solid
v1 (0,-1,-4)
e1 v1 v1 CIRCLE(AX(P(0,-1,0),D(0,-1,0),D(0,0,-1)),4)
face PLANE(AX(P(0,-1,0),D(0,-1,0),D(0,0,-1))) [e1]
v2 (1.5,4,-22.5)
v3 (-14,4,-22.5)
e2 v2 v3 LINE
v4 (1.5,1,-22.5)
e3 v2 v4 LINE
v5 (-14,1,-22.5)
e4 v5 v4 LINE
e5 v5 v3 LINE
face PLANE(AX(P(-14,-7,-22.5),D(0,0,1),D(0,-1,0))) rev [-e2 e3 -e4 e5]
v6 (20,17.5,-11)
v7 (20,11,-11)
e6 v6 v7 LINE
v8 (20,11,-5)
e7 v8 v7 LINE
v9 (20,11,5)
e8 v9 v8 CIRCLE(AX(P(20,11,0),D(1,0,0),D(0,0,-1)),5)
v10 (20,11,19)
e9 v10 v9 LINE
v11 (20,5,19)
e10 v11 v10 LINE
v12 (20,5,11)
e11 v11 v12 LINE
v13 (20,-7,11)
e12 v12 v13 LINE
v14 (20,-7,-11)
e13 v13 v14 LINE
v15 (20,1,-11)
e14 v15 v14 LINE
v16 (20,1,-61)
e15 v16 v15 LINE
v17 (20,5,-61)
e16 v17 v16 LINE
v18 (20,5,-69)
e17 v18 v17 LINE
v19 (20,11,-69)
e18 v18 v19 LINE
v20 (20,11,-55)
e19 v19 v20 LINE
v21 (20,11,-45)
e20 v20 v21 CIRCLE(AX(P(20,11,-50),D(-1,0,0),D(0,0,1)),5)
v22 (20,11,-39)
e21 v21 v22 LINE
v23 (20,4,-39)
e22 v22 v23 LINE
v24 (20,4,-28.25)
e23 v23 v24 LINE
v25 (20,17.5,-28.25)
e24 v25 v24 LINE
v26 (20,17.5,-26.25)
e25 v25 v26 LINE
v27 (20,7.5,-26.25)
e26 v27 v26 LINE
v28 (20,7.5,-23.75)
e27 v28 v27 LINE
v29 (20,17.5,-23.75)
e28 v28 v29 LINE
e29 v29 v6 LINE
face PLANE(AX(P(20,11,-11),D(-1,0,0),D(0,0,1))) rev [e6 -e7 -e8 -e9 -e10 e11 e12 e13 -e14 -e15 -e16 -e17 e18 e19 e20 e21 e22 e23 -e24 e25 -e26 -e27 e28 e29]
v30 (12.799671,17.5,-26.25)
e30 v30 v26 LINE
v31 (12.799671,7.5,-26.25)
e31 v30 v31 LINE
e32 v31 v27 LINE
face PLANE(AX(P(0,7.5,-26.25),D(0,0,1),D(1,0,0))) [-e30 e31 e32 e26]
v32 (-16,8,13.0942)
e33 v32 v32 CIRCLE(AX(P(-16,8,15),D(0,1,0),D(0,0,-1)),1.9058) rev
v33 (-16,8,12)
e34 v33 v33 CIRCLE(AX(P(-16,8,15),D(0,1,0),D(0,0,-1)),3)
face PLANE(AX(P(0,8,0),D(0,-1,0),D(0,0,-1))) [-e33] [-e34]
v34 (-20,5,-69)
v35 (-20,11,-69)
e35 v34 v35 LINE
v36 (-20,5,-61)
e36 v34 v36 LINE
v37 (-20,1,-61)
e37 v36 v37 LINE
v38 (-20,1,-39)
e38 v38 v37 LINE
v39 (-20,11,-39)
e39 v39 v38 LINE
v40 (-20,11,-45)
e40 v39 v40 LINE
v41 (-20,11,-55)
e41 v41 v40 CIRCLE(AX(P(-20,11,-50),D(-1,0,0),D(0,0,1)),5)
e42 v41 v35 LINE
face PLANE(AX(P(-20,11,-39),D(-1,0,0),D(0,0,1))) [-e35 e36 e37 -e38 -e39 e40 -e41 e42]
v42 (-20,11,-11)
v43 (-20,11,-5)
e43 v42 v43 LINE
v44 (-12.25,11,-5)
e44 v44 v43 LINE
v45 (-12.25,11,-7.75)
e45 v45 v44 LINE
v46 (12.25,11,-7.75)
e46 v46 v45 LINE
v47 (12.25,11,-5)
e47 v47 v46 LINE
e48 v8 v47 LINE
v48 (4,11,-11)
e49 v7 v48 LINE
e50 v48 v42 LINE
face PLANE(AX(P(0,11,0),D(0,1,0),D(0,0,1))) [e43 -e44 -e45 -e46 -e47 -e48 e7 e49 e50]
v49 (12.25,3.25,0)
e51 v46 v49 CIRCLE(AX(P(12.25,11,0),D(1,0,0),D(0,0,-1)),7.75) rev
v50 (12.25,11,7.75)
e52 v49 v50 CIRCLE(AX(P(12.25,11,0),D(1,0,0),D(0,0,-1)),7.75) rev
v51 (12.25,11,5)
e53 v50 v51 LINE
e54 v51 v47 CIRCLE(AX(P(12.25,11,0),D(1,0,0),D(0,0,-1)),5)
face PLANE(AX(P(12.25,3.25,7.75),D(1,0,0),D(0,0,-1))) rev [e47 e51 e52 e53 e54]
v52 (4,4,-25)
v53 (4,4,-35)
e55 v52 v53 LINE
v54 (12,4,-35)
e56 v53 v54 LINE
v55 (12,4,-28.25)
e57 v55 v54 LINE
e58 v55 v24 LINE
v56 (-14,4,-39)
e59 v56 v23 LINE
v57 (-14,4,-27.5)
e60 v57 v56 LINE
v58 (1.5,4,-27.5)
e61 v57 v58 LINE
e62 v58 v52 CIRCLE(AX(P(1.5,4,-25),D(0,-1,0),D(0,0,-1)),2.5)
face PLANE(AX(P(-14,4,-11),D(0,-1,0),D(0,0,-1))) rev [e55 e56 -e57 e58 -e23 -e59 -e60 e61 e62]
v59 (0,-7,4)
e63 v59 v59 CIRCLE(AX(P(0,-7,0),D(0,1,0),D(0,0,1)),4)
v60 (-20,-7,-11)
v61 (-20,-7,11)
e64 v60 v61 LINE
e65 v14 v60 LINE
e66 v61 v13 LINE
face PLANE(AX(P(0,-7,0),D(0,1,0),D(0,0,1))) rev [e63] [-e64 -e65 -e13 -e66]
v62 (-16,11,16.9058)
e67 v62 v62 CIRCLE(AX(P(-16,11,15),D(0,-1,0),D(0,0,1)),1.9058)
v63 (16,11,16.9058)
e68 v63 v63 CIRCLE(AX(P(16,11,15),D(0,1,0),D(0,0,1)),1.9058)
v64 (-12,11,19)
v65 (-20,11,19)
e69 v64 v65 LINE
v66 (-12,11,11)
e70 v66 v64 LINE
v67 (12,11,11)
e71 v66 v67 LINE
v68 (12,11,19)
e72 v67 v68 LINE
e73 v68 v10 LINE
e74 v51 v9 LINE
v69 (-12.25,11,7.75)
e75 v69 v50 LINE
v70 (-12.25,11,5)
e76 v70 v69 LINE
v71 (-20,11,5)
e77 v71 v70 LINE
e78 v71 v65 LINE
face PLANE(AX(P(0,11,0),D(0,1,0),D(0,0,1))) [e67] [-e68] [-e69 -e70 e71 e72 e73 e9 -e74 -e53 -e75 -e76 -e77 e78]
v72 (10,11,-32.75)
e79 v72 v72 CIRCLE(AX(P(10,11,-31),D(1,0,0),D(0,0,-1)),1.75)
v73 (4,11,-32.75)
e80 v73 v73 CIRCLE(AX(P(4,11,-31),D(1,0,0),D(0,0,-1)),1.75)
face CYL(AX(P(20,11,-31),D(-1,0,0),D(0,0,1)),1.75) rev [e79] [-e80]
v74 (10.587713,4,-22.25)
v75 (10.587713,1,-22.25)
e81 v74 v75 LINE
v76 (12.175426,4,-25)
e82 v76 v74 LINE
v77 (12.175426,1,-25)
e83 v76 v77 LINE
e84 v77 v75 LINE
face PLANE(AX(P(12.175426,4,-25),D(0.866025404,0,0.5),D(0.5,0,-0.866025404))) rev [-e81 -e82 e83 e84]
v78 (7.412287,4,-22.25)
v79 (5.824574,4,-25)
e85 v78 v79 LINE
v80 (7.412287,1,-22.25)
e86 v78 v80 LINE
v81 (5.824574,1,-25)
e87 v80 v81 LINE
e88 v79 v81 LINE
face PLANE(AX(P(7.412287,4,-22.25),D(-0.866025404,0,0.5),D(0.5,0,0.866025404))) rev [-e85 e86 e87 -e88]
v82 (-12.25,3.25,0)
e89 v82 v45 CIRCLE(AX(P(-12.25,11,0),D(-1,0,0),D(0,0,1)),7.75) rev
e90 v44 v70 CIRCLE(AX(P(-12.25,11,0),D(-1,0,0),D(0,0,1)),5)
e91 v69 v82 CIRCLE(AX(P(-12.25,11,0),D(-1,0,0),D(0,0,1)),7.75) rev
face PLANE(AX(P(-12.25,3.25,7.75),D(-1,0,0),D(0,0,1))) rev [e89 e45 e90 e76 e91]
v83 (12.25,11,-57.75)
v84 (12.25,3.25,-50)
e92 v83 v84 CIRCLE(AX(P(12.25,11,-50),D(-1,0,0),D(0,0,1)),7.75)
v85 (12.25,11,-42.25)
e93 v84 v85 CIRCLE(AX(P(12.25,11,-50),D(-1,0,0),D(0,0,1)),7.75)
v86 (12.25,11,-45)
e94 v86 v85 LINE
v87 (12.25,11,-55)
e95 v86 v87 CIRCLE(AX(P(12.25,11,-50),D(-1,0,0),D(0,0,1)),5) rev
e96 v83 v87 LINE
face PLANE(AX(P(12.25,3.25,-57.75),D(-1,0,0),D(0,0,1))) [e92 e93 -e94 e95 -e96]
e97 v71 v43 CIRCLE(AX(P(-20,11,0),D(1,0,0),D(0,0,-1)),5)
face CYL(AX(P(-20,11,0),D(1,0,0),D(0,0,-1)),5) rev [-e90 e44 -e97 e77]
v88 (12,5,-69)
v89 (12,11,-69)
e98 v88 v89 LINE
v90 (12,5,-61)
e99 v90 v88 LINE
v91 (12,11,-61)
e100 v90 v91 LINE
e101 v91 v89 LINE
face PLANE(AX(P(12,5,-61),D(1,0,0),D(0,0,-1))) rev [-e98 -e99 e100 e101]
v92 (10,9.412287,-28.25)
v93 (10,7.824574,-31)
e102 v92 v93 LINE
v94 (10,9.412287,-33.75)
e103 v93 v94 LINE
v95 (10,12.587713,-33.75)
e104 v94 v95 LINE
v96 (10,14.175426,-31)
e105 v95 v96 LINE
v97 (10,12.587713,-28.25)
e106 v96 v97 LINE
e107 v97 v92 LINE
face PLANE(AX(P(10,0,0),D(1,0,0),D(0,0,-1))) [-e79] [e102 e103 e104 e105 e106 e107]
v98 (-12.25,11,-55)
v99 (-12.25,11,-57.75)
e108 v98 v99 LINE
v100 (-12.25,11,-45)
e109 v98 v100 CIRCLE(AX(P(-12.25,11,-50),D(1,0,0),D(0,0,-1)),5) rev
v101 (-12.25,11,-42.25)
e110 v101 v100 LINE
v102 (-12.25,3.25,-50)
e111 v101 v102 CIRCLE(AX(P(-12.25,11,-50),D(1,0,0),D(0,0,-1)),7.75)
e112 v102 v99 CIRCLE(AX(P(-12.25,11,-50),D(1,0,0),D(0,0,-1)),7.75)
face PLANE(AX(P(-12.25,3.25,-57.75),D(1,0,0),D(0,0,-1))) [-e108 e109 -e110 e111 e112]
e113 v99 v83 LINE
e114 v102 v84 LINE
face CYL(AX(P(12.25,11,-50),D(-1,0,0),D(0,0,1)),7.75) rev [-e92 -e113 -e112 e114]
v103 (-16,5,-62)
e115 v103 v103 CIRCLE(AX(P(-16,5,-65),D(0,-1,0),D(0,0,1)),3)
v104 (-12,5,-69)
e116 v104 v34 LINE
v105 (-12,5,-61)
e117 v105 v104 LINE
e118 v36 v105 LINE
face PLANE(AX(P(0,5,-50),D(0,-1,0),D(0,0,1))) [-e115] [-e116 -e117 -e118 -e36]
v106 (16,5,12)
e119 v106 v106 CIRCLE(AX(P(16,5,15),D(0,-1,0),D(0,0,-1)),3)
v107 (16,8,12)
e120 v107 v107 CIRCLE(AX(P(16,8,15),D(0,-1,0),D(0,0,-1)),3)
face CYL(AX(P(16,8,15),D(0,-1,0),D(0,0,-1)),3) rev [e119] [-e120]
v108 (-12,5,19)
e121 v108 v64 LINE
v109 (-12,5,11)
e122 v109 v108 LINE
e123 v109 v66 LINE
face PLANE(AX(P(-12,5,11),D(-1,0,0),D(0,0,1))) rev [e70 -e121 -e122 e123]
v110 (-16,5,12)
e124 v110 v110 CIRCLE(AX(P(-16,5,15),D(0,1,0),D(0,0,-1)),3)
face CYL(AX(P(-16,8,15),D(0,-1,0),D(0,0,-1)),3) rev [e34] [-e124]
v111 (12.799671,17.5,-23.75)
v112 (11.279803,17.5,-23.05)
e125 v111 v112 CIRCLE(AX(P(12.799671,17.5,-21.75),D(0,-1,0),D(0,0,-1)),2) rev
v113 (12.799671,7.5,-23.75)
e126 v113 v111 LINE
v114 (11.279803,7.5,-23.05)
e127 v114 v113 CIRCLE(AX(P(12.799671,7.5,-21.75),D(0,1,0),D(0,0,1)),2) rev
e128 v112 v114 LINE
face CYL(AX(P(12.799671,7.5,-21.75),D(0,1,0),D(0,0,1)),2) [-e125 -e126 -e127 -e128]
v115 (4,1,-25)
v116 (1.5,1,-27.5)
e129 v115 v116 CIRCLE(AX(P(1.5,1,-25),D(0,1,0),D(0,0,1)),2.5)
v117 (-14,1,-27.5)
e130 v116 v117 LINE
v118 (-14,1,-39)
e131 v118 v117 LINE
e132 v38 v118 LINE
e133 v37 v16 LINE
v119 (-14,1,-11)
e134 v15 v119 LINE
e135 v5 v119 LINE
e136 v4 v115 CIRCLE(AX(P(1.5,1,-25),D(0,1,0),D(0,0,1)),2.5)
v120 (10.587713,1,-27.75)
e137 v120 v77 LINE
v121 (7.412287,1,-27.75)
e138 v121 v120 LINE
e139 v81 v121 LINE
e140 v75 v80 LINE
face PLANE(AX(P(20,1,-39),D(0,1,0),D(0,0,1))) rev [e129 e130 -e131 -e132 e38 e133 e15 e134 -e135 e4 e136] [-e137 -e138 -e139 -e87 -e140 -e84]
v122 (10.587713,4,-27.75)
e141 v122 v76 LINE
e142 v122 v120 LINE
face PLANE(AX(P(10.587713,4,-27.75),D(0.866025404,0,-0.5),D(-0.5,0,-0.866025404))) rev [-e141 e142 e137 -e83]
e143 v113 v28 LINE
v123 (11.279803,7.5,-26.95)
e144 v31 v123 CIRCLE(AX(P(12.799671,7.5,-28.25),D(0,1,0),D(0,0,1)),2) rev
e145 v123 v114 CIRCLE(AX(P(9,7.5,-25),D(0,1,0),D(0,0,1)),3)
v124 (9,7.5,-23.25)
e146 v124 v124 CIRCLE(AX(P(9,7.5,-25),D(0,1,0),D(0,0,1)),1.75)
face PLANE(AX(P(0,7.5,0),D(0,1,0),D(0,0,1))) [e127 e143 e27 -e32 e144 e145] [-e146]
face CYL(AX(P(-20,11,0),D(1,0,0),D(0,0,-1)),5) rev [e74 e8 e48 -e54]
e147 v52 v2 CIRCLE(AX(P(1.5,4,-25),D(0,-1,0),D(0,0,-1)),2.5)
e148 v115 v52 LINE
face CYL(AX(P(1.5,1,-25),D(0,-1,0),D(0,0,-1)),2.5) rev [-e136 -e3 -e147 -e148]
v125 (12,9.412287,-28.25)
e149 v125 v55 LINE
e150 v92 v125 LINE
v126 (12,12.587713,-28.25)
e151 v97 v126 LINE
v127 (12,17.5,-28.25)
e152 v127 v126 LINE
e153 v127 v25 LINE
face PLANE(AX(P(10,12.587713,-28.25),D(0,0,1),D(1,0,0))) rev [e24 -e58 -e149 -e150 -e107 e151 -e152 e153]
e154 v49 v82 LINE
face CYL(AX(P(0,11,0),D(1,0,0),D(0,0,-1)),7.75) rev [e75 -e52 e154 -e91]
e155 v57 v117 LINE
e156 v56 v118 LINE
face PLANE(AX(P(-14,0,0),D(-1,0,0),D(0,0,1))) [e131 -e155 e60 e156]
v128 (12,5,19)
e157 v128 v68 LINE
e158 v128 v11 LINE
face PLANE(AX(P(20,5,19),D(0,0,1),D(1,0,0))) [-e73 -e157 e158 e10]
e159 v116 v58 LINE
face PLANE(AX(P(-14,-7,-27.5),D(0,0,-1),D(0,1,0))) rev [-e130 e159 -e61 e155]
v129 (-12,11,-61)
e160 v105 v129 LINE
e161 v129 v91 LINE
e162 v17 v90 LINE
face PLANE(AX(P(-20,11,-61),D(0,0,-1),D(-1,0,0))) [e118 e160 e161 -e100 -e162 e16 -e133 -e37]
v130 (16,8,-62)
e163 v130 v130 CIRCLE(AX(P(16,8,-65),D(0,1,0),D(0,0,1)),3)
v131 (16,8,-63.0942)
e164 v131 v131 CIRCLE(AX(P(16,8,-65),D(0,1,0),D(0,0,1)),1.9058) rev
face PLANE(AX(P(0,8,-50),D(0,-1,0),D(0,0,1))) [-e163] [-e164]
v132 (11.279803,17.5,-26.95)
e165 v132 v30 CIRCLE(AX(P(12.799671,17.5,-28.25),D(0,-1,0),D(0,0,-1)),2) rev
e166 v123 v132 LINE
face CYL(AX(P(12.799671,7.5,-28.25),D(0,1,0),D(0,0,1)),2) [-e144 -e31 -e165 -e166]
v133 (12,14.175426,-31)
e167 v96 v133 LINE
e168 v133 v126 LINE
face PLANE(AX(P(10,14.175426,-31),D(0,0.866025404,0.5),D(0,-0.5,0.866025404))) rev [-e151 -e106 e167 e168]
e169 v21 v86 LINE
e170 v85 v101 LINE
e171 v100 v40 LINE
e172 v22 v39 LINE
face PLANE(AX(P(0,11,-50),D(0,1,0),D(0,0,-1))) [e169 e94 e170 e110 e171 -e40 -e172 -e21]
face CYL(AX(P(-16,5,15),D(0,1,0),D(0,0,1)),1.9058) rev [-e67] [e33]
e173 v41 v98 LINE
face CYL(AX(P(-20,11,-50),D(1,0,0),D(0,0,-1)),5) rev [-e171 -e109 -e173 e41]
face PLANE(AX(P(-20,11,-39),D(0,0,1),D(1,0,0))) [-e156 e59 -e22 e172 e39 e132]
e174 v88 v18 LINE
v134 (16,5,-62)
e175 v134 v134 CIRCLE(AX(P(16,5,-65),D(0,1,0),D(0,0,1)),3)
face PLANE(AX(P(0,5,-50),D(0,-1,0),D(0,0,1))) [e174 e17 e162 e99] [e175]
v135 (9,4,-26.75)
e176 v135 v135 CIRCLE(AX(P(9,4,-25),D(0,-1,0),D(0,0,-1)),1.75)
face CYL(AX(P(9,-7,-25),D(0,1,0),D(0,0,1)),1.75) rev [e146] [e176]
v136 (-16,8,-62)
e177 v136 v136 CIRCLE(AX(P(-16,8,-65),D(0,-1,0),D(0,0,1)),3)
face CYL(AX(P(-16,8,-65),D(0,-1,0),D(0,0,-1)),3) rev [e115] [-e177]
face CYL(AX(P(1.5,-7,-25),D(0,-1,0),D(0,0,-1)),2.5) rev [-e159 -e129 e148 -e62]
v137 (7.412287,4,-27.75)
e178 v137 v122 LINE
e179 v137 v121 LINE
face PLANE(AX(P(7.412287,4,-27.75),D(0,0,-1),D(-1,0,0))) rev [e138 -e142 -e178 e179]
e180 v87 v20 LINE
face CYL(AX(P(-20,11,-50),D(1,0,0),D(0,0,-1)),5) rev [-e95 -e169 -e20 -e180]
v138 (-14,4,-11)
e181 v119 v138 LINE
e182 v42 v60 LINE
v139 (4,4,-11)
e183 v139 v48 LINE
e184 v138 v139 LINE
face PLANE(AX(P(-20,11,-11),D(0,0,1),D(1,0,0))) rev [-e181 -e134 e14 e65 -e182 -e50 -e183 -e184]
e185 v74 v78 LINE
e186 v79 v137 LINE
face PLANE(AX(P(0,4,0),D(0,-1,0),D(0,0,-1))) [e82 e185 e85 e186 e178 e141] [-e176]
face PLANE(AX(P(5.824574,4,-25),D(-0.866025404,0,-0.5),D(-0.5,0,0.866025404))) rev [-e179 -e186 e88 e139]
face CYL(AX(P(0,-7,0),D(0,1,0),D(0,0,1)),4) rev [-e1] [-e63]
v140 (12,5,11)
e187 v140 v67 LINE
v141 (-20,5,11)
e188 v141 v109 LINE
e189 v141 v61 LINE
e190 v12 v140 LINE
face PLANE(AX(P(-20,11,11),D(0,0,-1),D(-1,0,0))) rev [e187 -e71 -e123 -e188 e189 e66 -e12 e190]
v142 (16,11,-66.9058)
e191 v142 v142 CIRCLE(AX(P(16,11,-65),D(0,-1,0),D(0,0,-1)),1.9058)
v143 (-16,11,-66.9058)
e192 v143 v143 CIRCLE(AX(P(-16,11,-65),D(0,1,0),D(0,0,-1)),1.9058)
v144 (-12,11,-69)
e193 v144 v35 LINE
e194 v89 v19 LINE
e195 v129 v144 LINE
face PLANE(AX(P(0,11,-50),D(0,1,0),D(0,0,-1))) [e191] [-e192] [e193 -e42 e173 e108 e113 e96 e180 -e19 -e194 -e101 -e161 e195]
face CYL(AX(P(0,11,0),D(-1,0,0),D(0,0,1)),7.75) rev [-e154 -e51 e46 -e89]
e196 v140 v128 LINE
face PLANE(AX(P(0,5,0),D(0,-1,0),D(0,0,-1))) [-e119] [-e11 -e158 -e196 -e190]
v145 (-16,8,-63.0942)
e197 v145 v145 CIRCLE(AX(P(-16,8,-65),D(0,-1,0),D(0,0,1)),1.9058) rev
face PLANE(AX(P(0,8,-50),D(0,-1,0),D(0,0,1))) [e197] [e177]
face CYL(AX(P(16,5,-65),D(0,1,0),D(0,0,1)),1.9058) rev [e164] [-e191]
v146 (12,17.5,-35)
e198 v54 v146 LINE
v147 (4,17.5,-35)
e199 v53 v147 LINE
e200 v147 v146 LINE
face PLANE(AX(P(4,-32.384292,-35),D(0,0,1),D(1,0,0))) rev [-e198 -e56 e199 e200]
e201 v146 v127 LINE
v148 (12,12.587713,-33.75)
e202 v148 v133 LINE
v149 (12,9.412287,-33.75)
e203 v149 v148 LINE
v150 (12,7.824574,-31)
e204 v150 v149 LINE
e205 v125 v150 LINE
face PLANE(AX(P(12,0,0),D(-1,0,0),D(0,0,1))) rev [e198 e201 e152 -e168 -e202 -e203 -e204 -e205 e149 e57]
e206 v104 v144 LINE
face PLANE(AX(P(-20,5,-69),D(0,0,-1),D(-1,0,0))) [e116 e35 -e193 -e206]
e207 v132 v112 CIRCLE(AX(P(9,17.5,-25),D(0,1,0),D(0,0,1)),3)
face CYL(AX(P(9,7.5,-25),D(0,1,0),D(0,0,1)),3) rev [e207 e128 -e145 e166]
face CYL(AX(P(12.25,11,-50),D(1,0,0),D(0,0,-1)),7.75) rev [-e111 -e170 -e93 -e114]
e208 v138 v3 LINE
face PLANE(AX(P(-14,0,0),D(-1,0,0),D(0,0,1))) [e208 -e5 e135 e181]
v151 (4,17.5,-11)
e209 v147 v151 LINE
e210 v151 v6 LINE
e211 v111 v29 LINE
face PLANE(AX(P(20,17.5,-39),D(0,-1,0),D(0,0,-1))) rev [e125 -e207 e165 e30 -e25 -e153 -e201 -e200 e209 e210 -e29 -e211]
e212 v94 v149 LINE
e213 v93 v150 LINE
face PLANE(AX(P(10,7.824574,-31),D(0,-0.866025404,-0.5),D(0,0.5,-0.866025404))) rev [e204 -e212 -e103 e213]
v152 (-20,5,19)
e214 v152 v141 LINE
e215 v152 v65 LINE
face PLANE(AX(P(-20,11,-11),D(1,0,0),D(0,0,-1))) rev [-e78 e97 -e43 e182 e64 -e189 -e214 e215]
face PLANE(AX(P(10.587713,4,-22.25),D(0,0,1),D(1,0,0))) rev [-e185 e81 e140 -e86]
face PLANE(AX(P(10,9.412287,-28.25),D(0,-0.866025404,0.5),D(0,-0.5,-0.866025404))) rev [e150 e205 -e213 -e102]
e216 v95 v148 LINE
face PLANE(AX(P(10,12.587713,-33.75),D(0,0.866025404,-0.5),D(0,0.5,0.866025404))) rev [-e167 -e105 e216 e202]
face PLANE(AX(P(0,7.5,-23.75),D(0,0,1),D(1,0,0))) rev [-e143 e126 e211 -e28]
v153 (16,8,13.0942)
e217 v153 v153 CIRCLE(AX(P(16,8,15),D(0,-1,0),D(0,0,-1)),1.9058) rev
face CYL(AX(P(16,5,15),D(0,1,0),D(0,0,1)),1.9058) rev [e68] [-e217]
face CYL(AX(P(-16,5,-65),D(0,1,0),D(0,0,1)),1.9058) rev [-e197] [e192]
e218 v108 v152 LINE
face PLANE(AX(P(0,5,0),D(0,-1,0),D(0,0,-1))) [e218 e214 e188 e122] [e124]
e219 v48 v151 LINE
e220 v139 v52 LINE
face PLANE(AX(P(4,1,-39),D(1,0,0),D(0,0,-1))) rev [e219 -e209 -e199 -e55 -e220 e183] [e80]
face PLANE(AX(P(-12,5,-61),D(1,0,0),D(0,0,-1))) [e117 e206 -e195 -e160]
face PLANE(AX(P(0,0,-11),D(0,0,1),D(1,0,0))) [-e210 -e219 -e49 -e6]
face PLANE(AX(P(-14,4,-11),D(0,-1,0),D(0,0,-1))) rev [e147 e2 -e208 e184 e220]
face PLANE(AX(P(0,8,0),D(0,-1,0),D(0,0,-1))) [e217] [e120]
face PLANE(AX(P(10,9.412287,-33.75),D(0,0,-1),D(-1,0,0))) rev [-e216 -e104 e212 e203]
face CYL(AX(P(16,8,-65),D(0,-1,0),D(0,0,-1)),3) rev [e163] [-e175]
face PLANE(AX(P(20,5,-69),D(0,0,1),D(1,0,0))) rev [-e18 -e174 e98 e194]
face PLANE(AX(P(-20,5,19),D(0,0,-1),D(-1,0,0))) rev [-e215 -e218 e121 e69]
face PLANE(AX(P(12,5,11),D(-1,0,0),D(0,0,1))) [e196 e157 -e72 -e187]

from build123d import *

# Parameters (mm, degrees)
SKETCH1_W                  = 40
SKETCH1_H                  = 22
BOSS_EXTRUDE1_DEPTH        = 11
SKETCH2_W                  = 40
SKETCH2_H                  = 22
SKETCH2_R                  = 4
BOSS_EXTRUDE2_DEPTH        = 7
SKETCH3_W                  = 24.5
SKETCH3_H                  = 15.5
CUT_EXTRUDE1_DEPTH         = 7.75
FILLET1_R                  = 7.75
SKETCH4_R                  = 5
CUT_EXTRUDE2_DEPTH         = 36.805900352
SKETCH5_W                  = 8
SKETCH5_H                  = 8
SKETCH5_R                  = 1.905800151
BOSS_EXTRUDE3_DEPTH        = 6
CUT_EXTRUDE3_START         = -3
SKETCH6_R                  = 3
SKETCH6_R_2                = 1.905800151
CUT_EXTRUDE3_DEPTH         = 3
SKETCH7_W                  = 16
SKETCH7_H                  = 16.5
BOSS_EXTRUDE5_DEPTH        = 28
MIRROR14_COPY_1_SKETCH_W   = 8
MIRROR14_COPY_1_SKETCH_H   = 8
MIRROR14_COPY_1_SKETCH_R   = 1.905800151
MIRROR14_COPY_1_DEPTH      = 6
MIRROR14_START             = -3
MIRROR14_COPY_2_SKETCH_R   = 3
MIRROR14_COPY_2_SKETCH_R_2 = 1.905800151
MIRROR14_COPY_2_DEPTH      = 3
FILLET1_OF_MIRROR14_R      = 7.75
SKETCH9_W                  = 28
SKETCH9_H                  = 3
BOSS_EXTRUDE6_DEPTH        = 18
CUT_EXTRUDE4_DEPTH         = 10
CUT_EXTRUDE5_DEPTH         = 74.288812243
CUT_EXTRUDE5_DEPTH_BACK    = 74.288812243
SKETCH11_R                 = 1.75
CUT_EXTRUDE6_DEPTH         = 76.121568141
CUT_EXTRUDE6_DEPTH_BACK    = 76.121568141
SKETCH12_R                 = 1.75
FILLET2_R                  = 2
CUT_EXTRUDE12_START        = -3
SKETCH17_R                 = 1.75
CUT_EXTRUDE12_DEPTH        = 3
CUT_EXTRUDE13_DEPTH        = 74.097537578
CUT_EXTRUDE13_DEPTH_BACK   = 74.097537578
SKETCH18_W                 = 18
SKETCH18_H                 = 5
FILLET3_R                  = 2.5
CUT_EXTRUDE14_DEPTH        = 74.710582687
CUT_EXTRUDE15_START        = -10
SKETCH21_R                 = 1.75
CUT_EXTRUDE15_DEPTH        = 10
SKETCH20_W                 = 36.163748027
SKETCH20_H                 = 4
CUT_EXTRUDE16_DEPTH        = 13.5
SKETCH22_W                 = 6.75
SKETCH22_H                 = 13.5
CUT_EXTRUDE18_DEPTH        = 8
SKETCH23_R                 = 4
BOSS_EXTRUDE8_DEPTH        = 1


with BuildPart() as part:
    # Sketch1 → Boss-Extrude1 (new body)
    with BuildSketch(Plane(origin=(0, 0, 0), x_dir=(1, 0, 0), z_dir=(0, 1, 0))):
        Rectangle(SKETCH1_W, SKETCH1_H)
    boss_extrude1 = extrude(amount=BOSS_EXTRUDE1_DEPTH)

    # Sketch2 → Boss-Extrude2 (add)
    with BuildSketch(Plane(origin=(0, 0, 0), x_dir=(1, 0, 0), z_dir=(0, 1, 0))):
        Rectangle(SKETCH2_W, SKETCH2_H)
        with Locations(Location((0, 0, 0), (0, 0, 270))):
            Circle(SKETCH2_R, mode=Mode.SUBTRACT)
    boss_extrude2 = extrude(amount=-BOSS_EXTRUDE2_DEPTH)

    # Sketch3 → Cut-Extrude1 (cut)
    with BuildSketch(Plane(origin=(0, 11, 0), x_dir=(1, 0, 0), z_dir=(0, 1, 0))):
        Rectangle(SKETCH3_W, SKETCH3_H)
    cut_extrude1 = extrude(amount=-CUT_EXTRUDE1_DEPTH, mode=Mode.SUBTRACT)

    # Fillet1
    fillet1_edges = [part.edges().sort_by_distance(p)[0] for p in [
        (0, 3.25, 7.75),
        (0, 3.25, -7.75),
    ]]
    fillet(fillet1_edges, radius=FILLET1_R - 0.0001)  # a hair under: the kernel refuses the full size

    # Sketch4 → Cut-Extrude2 (cut, symmetric)
    with BuildSketch(Plane(origin=(-12.25, 0, 0), x_dir=(0, 0, -1), z_dir=(1, 0, 0))):
        with Locations((0, 11)):
            Circle(SKETCH4_R)
    cut_extrude2 = extrude(amount=CUT_EXTRUDE2_DEPTH, both=True, mode=Mode.SUBTRACT)

    # Sketch5 → Boss-Extrude3 (add)
    with BuildSketch(Plane(origin=(0, 11, 0), x_dir=(1, 0, 0), z_dir=(0, 1, 0))):
        with Locations((16, -15)):
            Rectangle(SKETCH5_W, SKETCH5_H)
        with Locations(Location((16, -15, 0), (0, 0, 270))):
            Circle(SKETCH5_R, mode=Mode.SUBTRACT)
    boss_extrude3 = extrude(amount=-BOSS_EXTRUDE3_DEPTH)

    # Sketch6 → Cut-Extrude3 (cut)
    with BuildSketch(Plane.XZ.offset(-5).offset(CUT_EXTRUDE3_START)):
        with Locations(Location((16, 15, 0), (0, 0, 270))):
            Circle(SKETCH6_R)
        with Locations(Location((16, 15, 0), (0, 0, 90))):
            Circle(SKETCH6_R_2, mode=Mode.SUBTRACT)
    cut_extrude3 = extrude(amount=CUT_EXTRUDE3_DEPTH, mode=Mode.SUBTRACT)

    # Mirror8: Boss-Extrude3, Cut-Extrude3 across plane
    add(boss_extrude3.mirror(Plane(origin=(0, 0, 0), x_dir=(0, 0, 1), z_dir=(1, 0, 0))))
    add(cut_extrude3.mirror(Plane(origin=(0, 0, 0), x_dir=(0, 0, 1), z_dir=(1, 0, 0))), mode=Mode.SUBTRACT)

    # Sketch7 → Boss-Extrude5 (add)
    with BuildSketch(Plane(origin=(0, 0, -11), x_dir=(-1, 0, 0), z_dir=(0, 0, -1))):
        with Locations((-12, 9.25)):
            Rectangle(SKETCH7_W, SKETCH7_H)
    extrude(amount=BOSS_EXTRUDE5_DEPTH)

    # Mirror14: Boss-Extrude1, Boss-Extrude2, Cut-Extrude1, Cut-Extrude2, Boss-Extrude3, Cut-Extrude3 across plane
    add(boss_extrude1.mirror(Plane.XY.offset(-25)))
    add(boss_extrude2.mirror(Plane.XY.offset(-25)))
    add(cut_extrude1.mirror(Plane.XY.offset(-25)), mode=Mode.SUBTRACT)
    add(cut_extrude2.mirror(Plane.XY.offset(-25)), mode=Mode.SUBTRACT)
    add(boss_extrude3.mirror(Plane.XY.offset(-25)))
    add(cut_extrude3.mirror(Plane.XY.offset(-25)), mode=Mode.SUBTRACT)

    # Mirror14 copy 1 sketch → Mirror14 copy 1 (add)
    with BuildSketch(Plane(origin=(0, 11, -50), x_dir=(-1, 0, 0), z_dir=(0, 1, 0))):
        with Locations((16, -15)):
            Rectangle(MIRROR14_COPY_1_SKETCH_W, MIRROR14_COPY_1_SKETCH_H)
        with Locations(Location((16, -15, 0), (0, 0, 270))):
            Circle(MIRROR14_COPY_1_SKETCH_R, mode=Mode.SUBTRACT)
    extrude(amount=-MIRROR14_COPY_1_DEPTH)

    # Mirror14 copy 2 sketch → Mirror14 copy 2 (cut)
    with BuildSketch(Plane(origin=(0, 5, -50), x_dir=(-1, 0, 0), z_dir=(0, -1, 0)).offset(MIRROR14_START)):
        with Locations(Location((16, 15, 0), (0, 0, 270))):
            Circle(MIRROR14_COPY_2_SKETCH_R)
        with Locations(Location((16, 15, 0), (0, 0, 90))):
            Circle(MIRROR14_COPY_2_SKETCH_R_2, mode=Mode.SUBTRACT)
    extrude(amount=MIRROR14_COPY_2_DEPTH, mode=Mode.SUBTRACT)

    # Fillet1 of Mirror14
    fillet1_of_mirror14_edges = [part.edges().sort_by_distance(p)[0] for p in [
        (0, 3.25, -57.75),
        (0, 3.25, -42.25),
    ]]
    fillet(fillet1_of_mirror14_edges, radius=FILLET1_OF_MIRROR14_R - 0.0001)  # a hair under: the kernel refuses the full size

    # Sketch9 → Boss-Extrude6 (add)
    with BuildSketch(Plane.ZY.offset(-4)):
        with Locations((-25, 2.5)):
            Rectangle(SKETCH9_W, SKETCH9_H)
    extrude(amount=BOSS_EXTRUDE6_DEPTH)

    # Sketch10 → Cut-Extrude4 (cut)
    with BuildSketch(Plane(origin=(0, 17.5, 0), x_dir=(1, 0, 0), z_dir=(0, 1, 0))):
        with BuildLine():
            Line((9, 26.25), (9, 23.75))
            Line((9, 23.75), (11.727178029, 23.75))
            ThreePointArc((11.727178029, 23.75), (11.931001031, 24.360286817), (12, 25))
            ThreePointArc((12, 25), (11.931001031, 25.639713183), (11.727178029, 26.25))
            Line((11.727178029, 26.25), (9, 26.25))
        make_face()
        with BuildLine():
            Line((11.727178029, 23.75), (9, 23.75))
            Line((9, 23.75), (9, 26.25))
            Line((9, 26.25), (11.727178029, 26.25))
            ThreePointArc((11.727178029, 26.25), (6, 25), (11.727178029, 23.75))
        make_face()
        with BuildLine():
            ThreePointArc((12, 25), (11.931001031, 24.360286817), (11.727178029, 23.75))
            Line((11.727178029, 23.75), (20, 23.75))
            Line((20, 23.75), (20, 26.25))
            Line((20, 26.25), (11.727178029, 26.25))
            ThreePointArc((11.727178029, 26.25), (11.931001031, 25.639713183), (12, 25))
        make_face()
    extrude(amount=-CUT_EXTRUDE4_DEPTH, mode=Mode.SUBTRACT)

    # Sketch11 → Cut-Extrude5 (cut, two sides: drawn at the far end of the back side and taken through both)
    with BuildSketch(Plane(origin=(0, 7.5, 0), x_dir=(1, 0, 0), z_dir=(0, 1, 0)).offset(-CUT_EXTRUDE5_DEPTH_BACK)):
        with Locations(Location((9, 25, 0), (0, 0, 270))):
            Circle(SKETCH11_R)
    extrude(amount=CUT_EXTRUDE5_DEPTH + CUT_EXTRUDE5_DEPTH_BACK, mode=Mode.SUBTRACT)

    # Sketch12 → Cut-Extrude6 (cut, two sides: drawn at the far end of the back side and taken through both)
    with BuildSketch(Plane.ZY.offset(-4).offset(-CUT_EXTRUDE6_DEPTH_BACK)):
        with Locations((-31, 11)):
            Circle(SKETCH12_R)
    extrude(amount=CUT_EXTRUDE6_DEPTH + CUT_EXTRUDE6_DEPTH_BACK, mode=Mode.SUBTRACT)

    # Fillet2
    fillet2_edges = [part.edges().sort_by_distance(p)[0] for p in [
        (11.727178029, 12.5, -23.75),
        (11.727178029, 12.5, -26.25),
    ]]
    fillet(fillet2_edges, radius=FILLET2_R)

    # Sketch17 → Cut-Extrude12 (cut)
    with BuildSketch(Plane.XZ.offset(-1).offset(CUT_EXTRUDE12_START)):
        Polygon((12.175426481, -25), (10.58771324, -22.25), (7.41228676, -22.25), (5.824573519, -25), (7.41228676, -27.75), (10.58771324, -27.75), align=None)
        with Locations(Location((9, -25, 0), (0, 0, 90))):
            Circle(SKETCH17_R, mode=Mode.SUBTRACT)
    extrude(amount=CUT_EXTRUDE12_DEPTH, mode=Mode.SUBTRACT)

    # Sketch18 → Cut-Extrude13 (cut, two sides: drawn at the far end of the back side and taken through both)
    with BuildSketch(Plane(origin=(0, 4, 0), x_dir=(1, 0, 0), z_dir=(0, 1, 0)).offset(-CUT_EXTRUDE13_DEPTH_BACK)):
        with Locations((-5, 25)):
            Rectangle(SKETCH18_W, SKETCH18_H)
    extrude(amount=CUT_EXTRUDE13_DEPTH + CUT_EXTRUDE13_DEPTH_BACK, mode=Mode.SUBTRACT)

    # Fillet3
    fillet3_edges = [part.edges().sort_by_distance(p)[0] for p in [
        (4, 2.5, -27.5),
        (4, 2.5, -22.5),
    ]]
    fillet(fillet3_edges, radius=FILLET3_R - 0.0001)  # a hair under: the kernel refuses the full size

    # Sketch19 → Cut-Extrude14 (cut, through all)
    with BuildSketch(Plane.XZ.offset(-1)):
        Polygon((20, -61), (20, -39), (-14, -39), (-20, -39), (-20, -61), align=None)
    extrude(amount=CUT_EXTRUDE14_DEPTH, mode=Mode.SUBTRACT)

    # Sketch21 → Cut-Extrude15 (cut)
    with BuildSketch(Plane(origin=(20, 0, 0), x_dir=(0, 0, -1), z_dir=(1, 0, 0)).offset(CUT_EXTRUDE15_START)):
        Polygon((31, 14.175426481), (28.25, 12.58771324), (28.25, 9.41228676), (31, 7.824573519), (33.75, 9.41228676), (33.75, 12.58771324), align=None)
        with Locations((31, 11)):
            Circle(SKETCH21_R, mode=Mode.SUBTRACT)
    extrude(amount=CUT_EXTRUDE15_DEPTH, mode=Mode.SUBTRACT)

    # Sketch20 → Cut-Extrude16 (cut)
    with BuildSketch(Plane(origin=(0, 17.5, 0), x_dir=(1, 0, 0), z_dir=(0, 1, 0))):
        with Locations((22.081874014, 37)):
            Rectangle(SKETCH20_W, SKETCH20_H)
    extrude(amount=-CUT_EXTRUDE16_DEPTH, mode=Mode.SUBTRACT)

    # Sketch22 → Cut-Extrude18 (cut)
    with BuildSketch(Plane(origin=(20, 0, 0), x_dir=(0, 0, -1), z_dir=(1, 0, 0))):
        with Locations((31.625, 10.75)):
            Rectangle(SKETCH22_W, SKETCH22_H)
    extrude(amount=-CUT_EXTRUDE18_DEPTH, mode=Mode.SUBTRACT)

    # Sketch23 → Boss-Extrude8 (add)
    with BuildSketch(Plane.XZ):
        with Locations(Location((0, 0, 0), (0, 0, 90))):
            Circle(SKETCH23_R)
    extrude(amount=BOSS_EXTRUDE8_DEPTH)


solid = part.part
